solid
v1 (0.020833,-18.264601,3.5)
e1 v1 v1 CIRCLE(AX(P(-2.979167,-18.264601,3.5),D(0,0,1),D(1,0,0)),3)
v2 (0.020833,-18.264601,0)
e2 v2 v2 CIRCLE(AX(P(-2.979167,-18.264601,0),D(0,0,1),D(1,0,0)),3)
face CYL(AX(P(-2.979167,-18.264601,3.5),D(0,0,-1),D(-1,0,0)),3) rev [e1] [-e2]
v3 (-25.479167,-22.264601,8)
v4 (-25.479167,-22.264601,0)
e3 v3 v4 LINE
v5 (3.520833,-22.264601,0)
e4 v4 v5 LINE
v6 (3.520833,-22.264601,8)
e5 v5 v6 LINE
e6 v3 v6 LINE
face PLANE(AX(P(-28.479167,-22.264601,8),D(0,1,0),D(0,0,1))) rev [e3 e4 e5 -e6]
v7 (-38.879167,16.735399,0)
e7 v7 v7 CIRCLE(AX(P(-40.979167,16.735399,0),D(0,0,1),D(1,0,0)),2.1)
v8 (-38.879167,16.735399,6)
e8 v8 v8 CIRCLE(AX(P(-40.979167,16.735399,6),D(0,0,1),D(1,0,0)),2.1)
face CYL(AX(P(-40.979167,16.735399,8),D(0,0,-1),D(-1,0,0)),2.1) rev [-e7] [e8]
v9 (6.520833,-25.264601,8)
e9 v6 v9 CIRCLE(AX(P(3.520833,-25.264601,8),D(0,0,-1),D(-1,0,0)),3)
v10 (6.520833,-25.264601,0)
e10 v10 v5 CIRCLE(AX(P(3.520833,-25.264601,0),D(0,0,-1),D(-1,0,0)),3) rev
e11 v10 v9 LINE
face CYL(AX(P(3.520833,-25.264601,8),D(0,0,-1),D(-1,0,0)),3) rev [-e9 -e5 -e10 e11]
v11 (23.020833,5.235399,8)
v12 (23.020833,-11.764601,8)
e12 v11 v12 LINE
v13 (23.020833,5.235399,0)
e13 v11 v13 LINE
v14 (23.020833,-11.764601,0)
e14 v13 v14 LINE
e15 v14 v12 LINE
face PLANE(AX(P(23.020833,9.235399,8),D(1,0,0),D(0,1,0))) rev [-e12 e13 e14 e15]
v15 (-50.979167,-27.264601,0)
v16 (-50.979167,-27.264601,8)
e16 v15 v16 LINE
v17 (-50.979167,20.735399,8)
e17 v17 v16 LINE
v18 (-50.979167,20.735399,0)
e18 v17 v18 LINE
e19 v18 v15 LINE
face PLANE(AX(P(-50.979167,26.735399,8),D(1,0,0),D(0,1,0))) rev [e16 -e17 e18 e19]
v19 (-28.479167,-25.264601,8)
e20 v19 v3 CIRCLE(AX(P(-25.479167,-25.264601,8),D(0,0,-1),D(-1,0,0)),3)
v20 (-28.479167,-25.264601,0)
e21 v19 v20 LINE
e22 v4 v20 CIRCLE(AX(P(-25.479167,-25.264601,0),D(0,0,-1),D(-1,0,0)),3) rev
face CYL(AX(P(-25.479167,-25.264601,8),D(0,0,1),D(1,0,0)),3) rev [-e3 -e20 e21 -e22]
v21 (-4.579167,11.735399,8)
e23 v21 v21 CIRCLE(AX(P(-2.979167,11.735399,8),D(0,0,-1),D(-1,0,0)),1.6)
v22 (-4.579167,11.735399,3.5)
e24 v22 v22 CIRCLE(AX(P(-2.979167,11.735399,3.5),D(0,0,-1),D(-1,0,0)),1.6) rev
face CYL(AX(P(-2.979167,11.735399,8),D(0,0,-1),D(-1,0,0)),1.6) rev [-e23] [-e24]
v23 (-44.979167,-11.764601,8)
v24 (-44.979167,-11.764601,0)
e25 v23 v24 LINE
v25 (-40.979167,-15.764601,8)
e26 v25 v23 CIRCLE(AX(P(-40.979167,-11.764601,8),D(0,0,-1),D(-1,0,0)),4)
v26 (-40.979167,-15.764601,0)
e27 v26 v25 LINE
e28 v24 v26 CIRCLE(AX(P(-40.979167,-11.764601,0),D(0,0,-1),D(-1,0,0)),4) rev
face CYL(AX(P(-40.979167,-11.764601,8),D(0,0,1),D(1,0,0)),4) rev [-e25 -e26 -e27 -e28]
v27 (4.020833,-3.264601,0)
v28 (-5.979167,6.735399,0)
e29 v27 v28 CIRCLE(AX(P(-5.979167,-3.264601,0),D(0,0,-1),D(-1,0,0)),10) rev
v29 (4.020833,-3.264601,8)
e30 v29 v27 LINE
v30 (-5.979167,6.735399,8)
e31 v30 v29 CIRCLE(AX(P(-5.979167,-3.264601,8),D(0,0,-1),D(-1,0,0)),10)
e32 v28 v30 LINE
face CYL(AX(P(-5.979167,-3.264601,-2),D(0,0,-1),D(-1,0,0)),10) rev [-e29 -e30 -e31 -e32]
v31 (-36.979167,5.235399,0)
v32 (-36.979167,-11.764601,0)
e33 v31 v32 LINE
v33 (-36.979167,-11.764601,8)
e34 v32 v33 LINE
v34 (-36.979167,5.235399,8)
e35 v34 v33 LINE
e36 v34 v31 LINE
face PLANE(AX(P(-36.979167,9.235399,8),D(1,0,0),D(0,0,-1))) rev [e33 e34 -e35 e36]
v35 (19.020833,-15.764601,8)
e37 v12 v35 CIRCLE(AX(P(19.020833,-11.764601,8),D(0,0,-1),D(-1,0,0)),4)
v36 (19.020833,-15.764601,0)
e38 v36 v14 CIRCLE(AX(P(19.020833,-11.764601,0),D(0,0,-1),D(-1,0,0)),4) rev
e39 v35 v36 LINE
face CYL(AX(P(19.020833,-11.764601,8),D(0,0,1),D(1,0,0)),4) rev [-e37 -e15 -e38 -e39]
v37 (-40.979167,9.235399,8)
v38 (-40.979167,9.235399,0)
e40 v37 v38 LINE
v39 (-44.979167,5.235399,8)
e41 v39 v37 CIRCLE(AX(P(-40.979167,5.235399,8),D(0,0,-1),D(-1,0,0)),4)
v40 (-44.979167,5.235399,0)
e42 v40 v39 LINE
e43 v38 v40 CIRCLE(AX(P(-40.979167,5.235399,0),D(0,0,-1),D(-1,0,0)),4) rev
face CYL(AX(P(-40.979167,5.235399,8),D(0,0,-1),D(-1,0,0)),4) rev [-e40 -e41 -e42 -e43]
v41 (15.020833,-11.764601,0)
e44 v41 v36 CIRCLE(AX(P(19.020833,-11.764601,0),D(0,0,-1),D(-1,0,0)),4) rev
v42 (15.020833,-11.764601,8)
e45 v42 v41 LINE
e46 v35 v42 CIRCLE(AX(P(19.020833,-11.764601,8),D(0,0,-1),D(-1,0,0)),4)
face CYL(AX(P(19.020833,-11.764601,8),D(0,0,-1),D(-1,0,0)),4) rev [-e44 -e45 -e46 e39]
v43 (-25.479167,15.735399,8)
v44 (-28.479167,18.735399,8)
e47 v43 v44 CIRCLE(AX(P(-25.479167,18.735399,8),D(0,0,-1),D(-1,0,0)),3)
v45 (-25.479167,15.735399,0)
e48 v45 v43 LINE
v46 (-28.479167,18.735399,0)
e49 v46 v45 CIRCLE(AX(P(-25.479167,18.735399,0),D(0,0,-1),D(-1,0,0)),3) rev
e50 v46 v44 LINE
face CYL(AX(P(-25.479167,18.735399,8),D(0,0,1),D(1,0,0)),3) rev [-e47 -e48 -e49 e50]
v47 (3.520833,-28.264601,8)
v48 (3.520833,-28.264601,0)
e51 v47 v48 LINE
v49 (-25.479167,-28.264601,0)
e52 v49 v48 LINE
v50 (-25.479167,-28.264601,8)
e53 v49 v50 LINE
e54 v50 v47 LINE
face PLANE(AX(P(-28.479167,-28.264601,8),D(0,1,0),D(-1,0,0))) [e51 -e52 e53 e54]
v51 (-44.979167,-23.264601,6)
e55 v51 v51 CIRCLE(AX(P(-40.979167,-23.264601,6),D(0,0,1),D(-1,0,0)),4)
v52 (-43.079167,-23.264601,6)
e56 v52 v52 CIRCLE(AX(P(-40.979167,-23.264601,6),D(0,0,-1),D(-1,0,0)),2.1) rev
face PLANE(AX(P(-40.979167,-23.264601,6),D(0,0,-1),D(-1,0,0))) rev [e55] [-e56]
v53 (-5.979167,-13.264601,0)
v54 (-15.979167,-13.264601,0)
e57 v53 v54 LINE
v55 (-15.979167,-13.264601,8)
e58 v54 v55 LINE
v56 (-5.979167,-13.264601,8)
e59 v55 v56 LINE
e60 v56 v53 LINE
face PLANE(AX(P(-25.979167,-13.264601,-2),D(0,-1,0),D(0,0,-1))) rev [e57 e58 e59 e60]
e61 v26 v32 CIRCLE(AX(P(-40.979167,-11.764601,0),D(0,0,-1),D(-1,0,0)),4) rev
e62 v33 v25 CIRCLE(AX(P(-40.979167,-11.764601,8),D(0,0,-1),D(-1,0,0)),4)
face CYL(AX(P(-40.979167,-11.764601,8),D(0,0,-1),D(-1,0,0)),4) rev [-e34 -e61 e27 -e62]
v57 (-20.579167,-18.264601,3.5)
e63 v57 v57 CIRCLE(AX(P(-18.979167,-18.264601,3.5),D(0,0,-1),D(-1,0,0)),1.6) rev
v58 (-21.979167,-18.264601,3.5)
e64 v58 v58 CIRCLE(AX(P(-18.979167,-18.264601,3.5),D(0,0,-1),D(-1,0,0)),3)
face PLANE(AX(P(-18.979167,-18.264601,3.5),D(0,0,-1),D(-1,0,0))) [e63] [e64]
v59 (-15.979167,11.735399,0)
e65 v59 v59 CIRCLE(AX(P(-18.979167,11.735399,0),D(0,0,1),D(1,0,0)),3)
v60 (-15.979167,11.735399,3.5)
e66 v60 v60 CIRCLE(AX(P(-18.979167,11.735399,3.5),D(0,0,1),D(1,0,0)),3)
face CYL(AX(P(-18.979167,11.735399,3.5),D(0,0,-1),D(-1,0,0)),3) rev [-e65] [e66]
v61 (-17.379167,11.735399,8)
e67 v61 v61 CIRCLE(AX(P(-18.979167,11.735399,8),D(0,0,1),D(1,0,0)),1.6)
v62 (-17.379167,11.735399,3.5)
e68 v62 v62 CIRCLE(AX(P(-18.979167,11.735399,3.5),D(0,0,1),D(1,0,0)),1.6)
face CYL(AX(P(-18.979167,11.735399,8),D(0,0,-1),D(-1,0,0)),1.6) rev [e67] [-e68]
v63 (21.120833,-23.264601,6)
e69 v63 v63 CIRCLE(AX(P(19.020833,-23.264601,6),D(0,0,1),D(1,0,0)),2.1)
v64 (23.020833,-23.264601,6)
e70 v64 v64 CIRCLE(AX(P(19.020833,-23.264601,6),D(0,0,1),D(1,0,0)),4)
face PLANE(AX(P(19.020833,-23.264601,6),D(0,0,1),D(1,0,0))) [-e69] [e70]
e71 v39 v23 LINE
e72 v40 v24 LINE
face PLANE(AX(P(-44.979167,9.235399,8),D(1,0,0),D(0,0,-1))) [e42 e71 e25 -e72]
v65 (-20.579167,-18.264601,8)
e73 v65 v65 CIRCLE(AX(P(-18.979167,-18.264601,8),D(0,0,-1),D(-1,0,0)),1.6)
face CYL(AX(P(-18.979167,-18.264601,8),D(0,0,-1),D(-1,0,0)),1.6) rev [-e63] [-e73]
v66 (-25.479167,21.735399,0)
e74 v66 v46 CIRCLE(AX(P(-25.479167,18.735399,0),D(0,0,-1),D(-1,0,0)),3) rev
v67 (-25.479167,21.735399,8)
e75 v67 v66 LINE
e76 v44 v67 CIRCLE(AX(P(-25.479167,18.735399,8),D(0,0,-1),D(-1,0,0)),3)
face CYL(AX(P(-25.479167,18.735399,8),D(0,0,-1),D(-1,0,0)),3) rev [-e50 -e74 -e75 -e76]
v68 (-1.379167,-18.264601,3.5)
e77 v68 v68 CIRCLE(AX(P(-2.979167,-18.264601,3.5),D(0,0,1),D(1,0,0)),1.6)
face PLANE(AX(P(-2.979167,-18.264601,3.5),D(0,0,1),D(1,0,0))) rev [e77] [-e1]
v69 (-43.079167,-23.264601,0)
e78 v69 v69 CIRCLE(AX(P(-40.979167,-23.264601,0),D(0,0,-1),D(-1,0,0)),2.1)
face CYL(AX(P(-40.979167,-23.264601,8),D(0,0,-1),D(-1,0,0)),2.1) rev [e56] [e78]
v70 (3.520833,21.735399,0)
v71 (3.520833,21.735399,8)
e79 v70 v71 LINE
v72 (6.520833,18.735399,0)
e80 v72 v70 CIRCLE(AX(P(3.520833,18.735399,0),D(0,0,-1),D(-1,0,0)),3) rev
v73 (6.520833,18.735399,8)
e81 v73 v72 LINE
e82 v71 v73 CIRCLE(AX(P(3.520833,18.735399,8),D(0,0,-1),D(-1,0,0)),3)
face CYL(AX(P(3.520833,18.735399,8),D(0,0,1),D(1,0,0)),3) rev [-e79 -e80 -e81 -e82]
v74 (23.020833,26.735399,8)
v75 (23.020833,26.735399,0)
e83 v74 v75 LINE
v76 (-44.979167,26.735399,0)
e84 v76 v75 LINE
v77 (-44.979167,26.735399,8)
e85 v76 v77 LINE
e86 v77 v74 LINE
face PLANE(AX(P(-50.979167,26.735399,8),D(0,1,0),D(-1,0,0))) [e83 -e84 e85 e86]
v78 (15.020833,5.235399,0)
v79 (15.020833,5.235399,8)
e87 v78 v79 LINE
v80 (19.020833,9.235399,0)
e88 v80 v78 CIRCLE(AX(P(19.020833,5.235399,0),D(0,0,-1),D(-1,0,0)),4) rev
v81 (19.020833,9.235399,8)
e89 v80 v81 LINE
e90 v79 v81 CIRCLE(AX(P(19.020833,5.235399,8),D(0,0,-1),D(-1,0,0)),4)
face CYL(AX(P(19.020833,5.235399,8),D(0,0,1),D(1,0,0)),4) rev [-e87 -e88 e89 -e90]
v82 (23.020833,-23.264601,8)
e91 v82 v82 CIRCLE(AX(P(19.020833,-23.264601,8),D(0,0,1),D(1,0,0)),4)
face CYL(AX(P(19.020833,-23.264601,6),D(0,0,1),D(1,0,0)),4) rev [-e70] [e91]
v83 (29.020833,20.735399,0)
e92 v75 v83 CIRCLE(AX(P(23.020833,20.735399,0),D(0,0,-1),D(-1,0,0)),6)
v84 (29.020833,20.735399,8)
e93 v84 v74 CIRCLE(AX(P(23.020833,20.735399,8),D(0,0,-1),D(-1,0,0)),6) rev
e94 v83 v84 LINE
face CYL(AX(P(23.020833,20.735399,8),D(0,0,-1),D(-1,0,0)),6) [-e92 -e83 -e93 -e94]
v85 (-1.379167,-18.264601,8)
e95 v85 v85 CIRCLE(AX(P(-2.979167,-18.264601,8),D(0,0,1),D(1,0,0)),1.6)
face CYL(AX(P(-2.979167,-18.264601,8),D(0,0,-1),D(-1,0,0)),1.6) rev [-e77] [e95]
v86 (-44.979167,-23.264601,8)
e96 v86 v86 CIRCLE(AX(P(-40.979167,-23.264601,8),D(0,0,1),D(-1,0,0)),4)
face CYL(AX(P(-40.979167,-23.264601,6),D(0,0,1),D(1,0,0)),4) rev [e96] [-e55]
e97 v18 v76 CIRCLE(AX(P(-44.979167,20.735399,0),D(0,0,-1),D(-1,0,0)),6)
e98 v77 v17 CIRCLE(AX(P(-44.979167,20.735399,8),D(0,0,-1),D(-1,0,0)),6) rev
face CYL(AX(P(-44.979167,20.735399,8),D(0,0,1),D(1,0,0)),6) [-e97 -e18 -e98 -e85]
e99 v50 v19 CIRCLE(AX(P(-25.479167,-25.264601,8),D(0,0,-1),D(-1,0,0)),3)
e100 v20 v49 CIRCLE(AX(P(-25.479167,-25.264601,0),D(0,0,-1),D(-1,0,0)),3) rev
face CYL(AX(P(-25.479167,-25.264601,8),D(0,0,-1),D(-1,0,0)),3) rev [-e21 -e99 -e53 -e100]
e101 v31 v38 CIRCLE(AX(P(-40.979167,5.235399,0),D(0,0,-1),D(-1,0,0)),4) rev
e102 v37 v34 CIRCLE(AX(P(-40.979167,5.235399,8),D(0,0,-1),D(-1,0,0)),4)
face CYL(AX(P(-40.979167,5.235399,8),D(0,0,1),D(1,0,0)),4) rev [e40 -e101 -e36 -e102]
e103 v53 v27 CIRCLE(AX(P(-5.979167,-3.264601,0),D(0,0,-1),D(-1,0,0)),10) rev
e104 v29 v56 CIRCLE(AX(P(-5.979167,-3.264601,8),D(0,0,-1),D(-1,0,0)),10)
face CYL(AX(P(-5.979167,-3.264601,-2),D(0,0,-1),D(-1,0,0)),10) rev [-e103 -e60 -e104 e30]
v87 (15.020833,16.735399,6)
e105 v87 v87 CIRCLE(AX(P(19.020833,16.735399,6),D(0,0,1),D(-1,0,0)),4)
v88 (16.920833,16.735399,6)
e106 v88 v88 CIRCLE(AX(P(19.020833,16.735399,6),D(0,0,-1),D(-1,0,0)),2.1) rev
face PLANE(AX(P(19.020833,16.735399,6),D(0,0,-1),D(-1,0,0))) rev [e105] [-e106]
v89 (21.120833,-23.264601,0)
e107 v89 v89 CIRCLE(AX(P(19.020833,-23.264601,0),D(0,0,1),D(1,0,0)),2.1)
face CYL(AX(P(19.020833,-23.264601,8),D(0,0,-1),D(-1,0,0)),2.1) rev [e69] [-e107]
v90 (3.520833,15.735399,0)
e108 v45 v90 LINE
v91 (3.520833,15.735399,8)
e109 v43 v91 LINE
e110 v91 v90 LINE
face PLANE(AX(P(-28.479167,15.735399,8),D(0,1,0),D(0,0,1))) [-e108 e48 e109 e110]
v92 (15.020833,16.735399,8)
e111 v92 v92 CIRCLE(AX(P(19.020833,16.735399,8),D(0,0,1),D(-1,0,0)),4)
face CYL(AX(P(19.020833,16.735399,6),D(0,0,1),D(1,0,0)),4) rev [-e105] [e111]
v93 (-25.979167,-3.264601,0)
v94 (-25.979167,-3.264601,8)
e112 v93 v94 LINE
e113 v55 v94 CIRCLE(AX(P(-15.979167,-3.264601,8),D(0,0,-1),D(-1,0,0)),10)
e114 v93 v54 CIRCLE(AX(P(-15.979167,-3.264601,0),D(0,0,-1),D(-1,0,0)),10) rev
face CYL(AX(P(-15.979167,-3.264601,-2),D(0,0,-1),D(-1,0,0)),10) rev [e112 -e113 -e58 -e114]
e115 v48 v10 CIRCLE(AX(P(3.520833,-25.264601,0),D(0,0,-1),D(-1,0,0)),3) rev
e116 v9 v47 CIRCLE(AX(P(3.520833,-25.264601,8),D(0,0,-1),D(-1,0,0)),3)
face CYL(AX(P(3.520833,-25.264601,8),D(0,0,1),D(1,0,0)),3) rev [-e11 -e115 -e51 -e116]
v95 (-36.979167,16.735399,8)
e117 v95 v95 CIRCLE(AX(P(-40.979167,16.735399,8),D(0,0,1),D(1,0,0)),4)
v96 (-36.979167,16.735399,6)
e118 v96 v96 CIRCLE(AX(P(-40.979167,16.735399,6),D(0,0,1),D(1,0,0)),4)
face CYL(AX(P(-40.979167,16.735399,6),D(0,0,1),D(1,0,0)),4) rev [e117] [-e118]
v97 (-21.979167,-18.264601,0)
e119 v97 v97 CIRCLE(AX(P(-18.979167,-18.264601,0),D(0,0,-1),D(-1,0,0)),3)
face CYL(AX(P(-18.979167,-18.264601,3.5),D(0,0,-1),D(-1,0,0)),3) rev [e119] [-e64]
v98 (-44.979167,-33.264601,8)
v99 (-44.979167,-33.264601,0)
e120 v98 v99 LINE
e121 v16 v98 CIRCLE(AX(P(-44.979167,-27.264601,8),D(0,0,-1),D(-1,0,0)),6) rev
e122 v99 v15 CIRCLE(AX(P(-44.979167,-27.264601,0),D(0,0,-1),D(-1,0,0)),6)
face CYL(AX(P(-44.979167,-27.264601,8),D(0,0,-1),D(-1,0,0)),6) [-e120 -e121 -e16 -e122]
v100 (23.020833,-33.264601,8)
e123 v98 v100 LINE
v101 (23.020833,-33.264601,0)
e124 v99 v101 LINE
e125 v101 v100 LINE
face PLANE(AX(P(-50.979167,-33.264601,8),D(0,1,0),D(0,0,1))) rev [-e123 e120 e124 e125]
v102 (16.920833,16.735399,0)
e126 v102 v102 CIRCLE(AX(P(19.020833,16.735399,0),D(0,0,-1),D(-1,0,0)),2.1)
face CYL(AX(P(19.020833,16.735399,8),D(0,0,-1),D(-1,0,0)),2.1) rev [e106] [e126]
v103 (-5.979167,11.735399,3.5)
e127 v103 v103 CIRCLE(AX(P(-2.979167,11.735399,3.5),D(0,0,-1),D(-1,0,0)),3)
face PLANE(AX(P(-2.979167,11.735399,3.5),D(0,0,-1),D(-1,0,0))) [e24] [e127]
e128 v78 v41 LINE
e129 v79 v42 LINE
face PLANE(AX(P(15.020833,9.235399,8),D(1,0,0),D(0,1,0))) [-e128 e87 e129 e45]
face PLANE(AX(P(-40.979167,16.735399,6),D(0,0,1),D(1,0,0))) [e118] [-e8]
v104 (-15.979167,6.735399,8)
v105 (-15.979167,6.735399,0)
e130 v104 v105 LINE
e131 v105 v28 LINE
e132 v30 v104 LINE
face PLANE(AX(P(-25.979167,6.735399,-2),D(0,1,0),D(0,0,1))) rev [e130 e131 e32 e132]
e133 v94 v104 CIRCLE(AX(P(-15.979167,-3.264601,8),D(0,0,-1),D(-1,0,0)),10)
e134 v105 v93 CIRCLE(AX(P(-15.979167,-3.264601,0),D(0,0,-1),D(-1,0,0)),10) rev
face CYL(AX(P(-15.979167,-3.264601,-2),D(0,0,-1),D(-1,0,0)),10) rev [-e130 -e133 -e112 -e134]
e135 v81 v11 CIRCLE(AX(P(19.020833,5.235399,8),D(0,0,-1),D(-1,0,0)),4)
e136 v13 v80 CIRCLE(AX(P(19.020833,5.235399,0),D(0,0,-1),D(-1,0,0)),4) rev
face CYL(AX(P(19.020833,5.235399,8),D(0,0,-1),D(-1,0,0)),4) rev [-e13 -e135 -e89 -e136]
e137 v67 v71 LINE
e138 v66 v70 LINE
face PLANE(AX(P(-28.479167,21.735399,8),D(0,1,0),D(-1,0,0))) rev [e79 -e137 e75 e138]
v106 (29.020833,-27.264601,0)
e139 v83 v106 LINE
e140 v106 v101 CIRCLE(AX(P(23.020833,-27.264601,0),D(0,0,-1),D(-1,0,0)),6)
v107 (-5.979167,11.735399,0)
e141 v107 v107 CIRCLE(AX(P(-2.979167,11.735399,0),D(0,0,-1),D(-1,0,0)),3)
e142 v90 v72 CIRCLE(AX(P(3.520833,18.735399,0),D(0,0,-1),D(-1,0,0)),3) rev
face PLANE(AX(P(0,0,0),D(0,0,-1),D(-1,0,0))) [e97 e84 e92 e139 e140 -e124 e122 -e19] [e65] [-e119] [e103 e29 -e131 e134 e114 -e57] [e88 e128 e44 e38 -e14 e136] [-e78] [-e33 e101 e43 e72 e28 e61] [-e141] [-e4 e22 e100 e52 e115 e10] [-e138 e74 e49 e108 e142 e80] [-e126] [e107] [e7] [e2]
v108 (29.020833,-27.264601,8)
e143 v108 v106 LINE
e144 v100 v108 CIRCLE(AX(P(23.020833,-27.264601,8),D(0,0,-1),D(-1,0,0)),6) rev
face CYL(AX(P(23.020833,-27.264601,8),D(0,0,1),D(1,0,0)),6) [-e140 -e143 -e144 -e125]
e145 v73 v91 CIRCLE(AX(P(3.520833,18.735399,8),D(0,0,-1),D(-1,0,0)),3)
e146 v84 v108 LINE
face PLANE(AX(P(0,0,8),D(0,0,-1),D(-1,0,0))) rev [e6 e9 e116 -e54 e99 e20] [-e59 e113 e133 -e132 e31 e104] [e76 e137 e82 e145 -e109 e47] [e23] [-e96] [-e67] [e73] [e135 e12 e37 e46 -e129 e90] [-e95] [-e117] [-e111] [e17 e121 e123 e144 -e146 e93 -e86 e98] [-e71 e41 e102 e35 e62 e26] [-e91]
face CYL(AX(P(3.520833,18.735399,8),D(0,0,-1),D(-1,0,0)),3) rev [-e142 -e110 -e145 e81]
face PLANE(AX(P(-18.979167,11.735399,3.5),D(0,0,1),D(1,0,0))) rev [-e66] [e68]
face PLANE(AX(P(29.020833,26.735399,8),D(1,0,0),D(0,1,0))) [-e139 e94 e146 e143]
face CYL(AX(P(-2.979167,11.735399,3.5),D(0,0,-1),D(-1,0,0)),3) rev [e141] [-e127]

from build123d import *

# Parameters (mm, degrees)
SKETCH_1_W             = 80
SKETCH_1_H             = 60
SKETCH_1_R             = 2.1
SKETCH_1_R_2           = 1.6
EXTRUDE_2_DEPTH        = 8
SKETCH_1_3_R           = 3
CUT_EXTRUDE_2_DEPTH    = 3.5
FILLET_1_R             = 6
SKETCH_1_4_W           = 35
SKETCH_1_4_H           = 6
CUT_EXTRUDE_3_DEPTH    = 62.395513597
FILLET_2_R             = 3
FILLET_2_OF_MIRROR_1_R = 3
SKETCH_1_5_W           = 8
SKETCH_1_5_H           = 25
CUT_EXTRUDE_4_DEPTH    = 62.395513597
FILLET_3_R             = 4
FILLET_3_OF_MIRROR_2_R = 4
SKETCH_2_R             = 4
CUT_EXTRUDE_5_DEPTH    = 2
SKETCH_3_W             = 30
SKETCH_3_H             = 20
CUT_EXTRUDE_6_DEPTH    = 10
FILLET_4_R             = 10


with BuildPart() as part:
    # 草图1 → 凸台-拉伸2 (new body)
    with BuildSketch(Plane.XY):
        with Locations((-10.979166634, -3.26460069)):
            Rectangle(SKETCH_1_W, SKETCH_1_H)
        with Locations((-40.979166634, 16.73539931)):
            Circle(SKETCH_1_R, mode=Mode.SUBTRACT)
        with Locations(Location((19.020833366, 16.73539931, 0), (0, 0, 180))):
            Circle(SKETCH_1_R, mode=Mode.SUBTRACT)
        with Locations((19.020833366, -23.26460069)):
            Circle(SKETCH_1_R, mode=Mode.SUBTRACT)
        with Locations(Location((-40.979166634, -23.26460069, 0), (0, 0, 180))):
            Circle(SKETCH_1_R, mode=Mode.SUBTRACT)
        with Locations((-18.979166634, 11.73539931)):
            Circle(SKETCH_1_R_2, mode=Mode.SUBTRACT)
        with Locations(Location((-2.979166634, 11.73539931, 0), (0, 0, 180))):
            Circle(SKETCH_1_R_2, mode=Mode.SUBTRACT)
        with Locations((-2.979166634, -18.26460069)):
            Circle(SKETCH_1_R_2, mode=Mode.SUBTRACT)
        with Locations(Location((-18.979166634, -18.26460069, 0), (0, 0, 180))):
            Circle(SKETCH_1_R_2, mode=Mode.SUBTRACT)
    extrude(amount=EXTRUDE_2_DEPTH)

    # 草图1<3> → 切除-拉伸2 (cut)
    with BuildSketch(Plane.XY):
        with Locations((-18.979166634, 11.73539931)):
            Circle(SKETCH_1_3_R)
        with Locations(Location((-2.979166634, 11.73539931, 0), (0, 0, 180))):
            Circle(SKETCH_1_3_R)
        with Locations((-2.979166634, -18.26460069)):
            Circle(SKETCH_1_3_R)
        with Locations(Location((-18.979166634, -18.26460069, 0), (0, 0, 180))):
            Circle(SKETCH_1_3_R)
    extrude(amount=CUT_EXTRUDE_2_DEPTH, mode=Mode.SUBTRACT)

    # 圆角1
    fillet_1_edges = [part.edges().sort_by_distance(p)[0] for p in [
        (-50.979166634, 26.73539931, 4),
        (-50.979166634, -33.26460069, 4),
        (29.020833366, -33.26460069, 4),
        (29.020833366, 26.73539931, 4),
    ]]
    fillet(fillet_1_edges, radius=FILLET_1_R)

    # 草图1<4> → 切除-拉伸3 (cut, through all)
    with BuildSketch(Plane.XY):
        with Locations((-10.979166634, 18.73539931)):
            Rectangle(SKETCH_1_4_W, SKETCH_1_4_H)
    cut_extrude_3 = extrude(amount=CUT_EXTRUDE_3_DEPTH, mode=Mode.SUBTRACT)

    # 圆角2
    fillet_2_edges = [part.edges().sort_by_distance(p)[0] for p in [
        (6.520833366, 15.73539931, 4),
        (6.520833366, 21.73539931, 4),
        (-28.479166634, 15.73539931, 4),
        (-28.479166634, 21.73539931, 4),
    ]]
    fillet(fillet_2_edges, radius=FILLET_2_R - 0.0001)  # a hair under: the kernel refuses the full size

    # 镜向1: 切除-拉伸3 across plane
    add(cut_extrude_3.mirror(Plane.ZX.offset(-3.26460069)), mode=Mode.SUBTRACT)

    # 圆角2 of 镜向1
    fillet_2_of_mirror_1_edges = [part.edges().sort_by_distance(p)[0] for p in [
        (6.520833366, -22.26460069, 4),
        (6.520833366, -28.26460069, 4),
        (-28.479166634, -22.26460069, 4),
        (-28.479166634, -28.26460069, 4),
    ]]
    fillet(fillet_2_of_mirror_1_edges, radius=FILLET_2_OF_MIRROR_1_R - 0.0001)  # a hair under: the kernel refuses the full size

    # 草图1<5> → 切除-拉伸4 (cut, through all)
    with BuildSketch(Plane.XY):
        with Locations((-40.979166634, -3.26460069)):
            Rectangle(SKETCH_1_5_W, SKETCH_1_5_H)
    cut_extrude_4 = extrude(amount=CUT_EXTRUDE_4_DEPTH, mode=Mode.SUBTRACT)

    # 圆角3
    fillet_3_edges = [part.edges().sort_by_distance(p)[0] for p in [
        (-36.979166634, -15.76460069, 4),
        (-44.979166634, -15.76460069, 4),
        (-36.979166634, 9.23539931, 4),
        (-44.979166634, 9.23539931, 4),
    ]]
    fillet(fillet_3_edges, radius=FILLET_3_R - 0.0001)  # a hair under: the kernel refuses the full size

    # 镜向2: 切除-拉伸4 across plane
    add(cut_extrude_4.mirror(Plane.ZY.offset(10.979166634)), mode=Mode.SUBTRACT)

    # 圆角3 of 镜向2
    fillet_3_of_mirror_2_edges = [part.edges().sort_by_distance(p)[0] for p in [
        (15.020833366, -15.76460069, 4),
        (23.020833366, -15.76460069, 4),
        (15.020833366, 9.23539931, 4),
        (23.020833366, 9.23539931, 4),
    ]]
    fillet(fillet_3_of_mirror_2_edges, radius=FILLET_3_OF_MIRROR_2_R - 0.0001)  # a hair under: the kernel refuses the full size

    # 草图2 → 切除-拉伸5 (cut)
    with BuildSketch(Plane.XY.offset(8)):
        with Locations((-40.979166634, 16.73539931)):
            Circle(SKETCH_2_R)
        with Locations(Location((19.020833366, 16.73539931, 0), (0, 0, 180))):
            Circle(SKETCH_2_R)
        with Locations((19.020833366, -23.26460069)):
            Circle(SKETCH_2_R)
        with Locations(Location((-40.979166634, -23.26460069, 0), (0, 0, 180))):
            Circle(SKETCH_2_R)
    extrude(amount=-CUT_EXTRUDE_5_DEPTH, mode=Mode.SUBTRACT)

    # 草图3 → 切除-拉伸6 (cut)
    with BuildSketch(Plane.XY.offset(8)):
        with Locations((-10.979166634, -3.26460069)):
            Rectangle(SKETCH_3_W, SKETCH_3_H)
    extrude(amount=-CUT_EXTRUDE_6_DEPTH, mode=Mode.SUBTRACT)

    # 圆角4
    fillet_4_edges = [part.edges().sort_by_distance(p)[0] for p in [
        (4.020833366, -13.26460069, 4),
        (-25.979166634, -13.26460069, 4),
        (4.020833366, 6.73539931, 4),
        (-25.979166634, 6.73539931, 4),
    ]]
    fillet(fillet_4_edges, radius=FILLET_4_R - 0.0001)  # a hair under: the kernel refuses the full size


solid = part.part
